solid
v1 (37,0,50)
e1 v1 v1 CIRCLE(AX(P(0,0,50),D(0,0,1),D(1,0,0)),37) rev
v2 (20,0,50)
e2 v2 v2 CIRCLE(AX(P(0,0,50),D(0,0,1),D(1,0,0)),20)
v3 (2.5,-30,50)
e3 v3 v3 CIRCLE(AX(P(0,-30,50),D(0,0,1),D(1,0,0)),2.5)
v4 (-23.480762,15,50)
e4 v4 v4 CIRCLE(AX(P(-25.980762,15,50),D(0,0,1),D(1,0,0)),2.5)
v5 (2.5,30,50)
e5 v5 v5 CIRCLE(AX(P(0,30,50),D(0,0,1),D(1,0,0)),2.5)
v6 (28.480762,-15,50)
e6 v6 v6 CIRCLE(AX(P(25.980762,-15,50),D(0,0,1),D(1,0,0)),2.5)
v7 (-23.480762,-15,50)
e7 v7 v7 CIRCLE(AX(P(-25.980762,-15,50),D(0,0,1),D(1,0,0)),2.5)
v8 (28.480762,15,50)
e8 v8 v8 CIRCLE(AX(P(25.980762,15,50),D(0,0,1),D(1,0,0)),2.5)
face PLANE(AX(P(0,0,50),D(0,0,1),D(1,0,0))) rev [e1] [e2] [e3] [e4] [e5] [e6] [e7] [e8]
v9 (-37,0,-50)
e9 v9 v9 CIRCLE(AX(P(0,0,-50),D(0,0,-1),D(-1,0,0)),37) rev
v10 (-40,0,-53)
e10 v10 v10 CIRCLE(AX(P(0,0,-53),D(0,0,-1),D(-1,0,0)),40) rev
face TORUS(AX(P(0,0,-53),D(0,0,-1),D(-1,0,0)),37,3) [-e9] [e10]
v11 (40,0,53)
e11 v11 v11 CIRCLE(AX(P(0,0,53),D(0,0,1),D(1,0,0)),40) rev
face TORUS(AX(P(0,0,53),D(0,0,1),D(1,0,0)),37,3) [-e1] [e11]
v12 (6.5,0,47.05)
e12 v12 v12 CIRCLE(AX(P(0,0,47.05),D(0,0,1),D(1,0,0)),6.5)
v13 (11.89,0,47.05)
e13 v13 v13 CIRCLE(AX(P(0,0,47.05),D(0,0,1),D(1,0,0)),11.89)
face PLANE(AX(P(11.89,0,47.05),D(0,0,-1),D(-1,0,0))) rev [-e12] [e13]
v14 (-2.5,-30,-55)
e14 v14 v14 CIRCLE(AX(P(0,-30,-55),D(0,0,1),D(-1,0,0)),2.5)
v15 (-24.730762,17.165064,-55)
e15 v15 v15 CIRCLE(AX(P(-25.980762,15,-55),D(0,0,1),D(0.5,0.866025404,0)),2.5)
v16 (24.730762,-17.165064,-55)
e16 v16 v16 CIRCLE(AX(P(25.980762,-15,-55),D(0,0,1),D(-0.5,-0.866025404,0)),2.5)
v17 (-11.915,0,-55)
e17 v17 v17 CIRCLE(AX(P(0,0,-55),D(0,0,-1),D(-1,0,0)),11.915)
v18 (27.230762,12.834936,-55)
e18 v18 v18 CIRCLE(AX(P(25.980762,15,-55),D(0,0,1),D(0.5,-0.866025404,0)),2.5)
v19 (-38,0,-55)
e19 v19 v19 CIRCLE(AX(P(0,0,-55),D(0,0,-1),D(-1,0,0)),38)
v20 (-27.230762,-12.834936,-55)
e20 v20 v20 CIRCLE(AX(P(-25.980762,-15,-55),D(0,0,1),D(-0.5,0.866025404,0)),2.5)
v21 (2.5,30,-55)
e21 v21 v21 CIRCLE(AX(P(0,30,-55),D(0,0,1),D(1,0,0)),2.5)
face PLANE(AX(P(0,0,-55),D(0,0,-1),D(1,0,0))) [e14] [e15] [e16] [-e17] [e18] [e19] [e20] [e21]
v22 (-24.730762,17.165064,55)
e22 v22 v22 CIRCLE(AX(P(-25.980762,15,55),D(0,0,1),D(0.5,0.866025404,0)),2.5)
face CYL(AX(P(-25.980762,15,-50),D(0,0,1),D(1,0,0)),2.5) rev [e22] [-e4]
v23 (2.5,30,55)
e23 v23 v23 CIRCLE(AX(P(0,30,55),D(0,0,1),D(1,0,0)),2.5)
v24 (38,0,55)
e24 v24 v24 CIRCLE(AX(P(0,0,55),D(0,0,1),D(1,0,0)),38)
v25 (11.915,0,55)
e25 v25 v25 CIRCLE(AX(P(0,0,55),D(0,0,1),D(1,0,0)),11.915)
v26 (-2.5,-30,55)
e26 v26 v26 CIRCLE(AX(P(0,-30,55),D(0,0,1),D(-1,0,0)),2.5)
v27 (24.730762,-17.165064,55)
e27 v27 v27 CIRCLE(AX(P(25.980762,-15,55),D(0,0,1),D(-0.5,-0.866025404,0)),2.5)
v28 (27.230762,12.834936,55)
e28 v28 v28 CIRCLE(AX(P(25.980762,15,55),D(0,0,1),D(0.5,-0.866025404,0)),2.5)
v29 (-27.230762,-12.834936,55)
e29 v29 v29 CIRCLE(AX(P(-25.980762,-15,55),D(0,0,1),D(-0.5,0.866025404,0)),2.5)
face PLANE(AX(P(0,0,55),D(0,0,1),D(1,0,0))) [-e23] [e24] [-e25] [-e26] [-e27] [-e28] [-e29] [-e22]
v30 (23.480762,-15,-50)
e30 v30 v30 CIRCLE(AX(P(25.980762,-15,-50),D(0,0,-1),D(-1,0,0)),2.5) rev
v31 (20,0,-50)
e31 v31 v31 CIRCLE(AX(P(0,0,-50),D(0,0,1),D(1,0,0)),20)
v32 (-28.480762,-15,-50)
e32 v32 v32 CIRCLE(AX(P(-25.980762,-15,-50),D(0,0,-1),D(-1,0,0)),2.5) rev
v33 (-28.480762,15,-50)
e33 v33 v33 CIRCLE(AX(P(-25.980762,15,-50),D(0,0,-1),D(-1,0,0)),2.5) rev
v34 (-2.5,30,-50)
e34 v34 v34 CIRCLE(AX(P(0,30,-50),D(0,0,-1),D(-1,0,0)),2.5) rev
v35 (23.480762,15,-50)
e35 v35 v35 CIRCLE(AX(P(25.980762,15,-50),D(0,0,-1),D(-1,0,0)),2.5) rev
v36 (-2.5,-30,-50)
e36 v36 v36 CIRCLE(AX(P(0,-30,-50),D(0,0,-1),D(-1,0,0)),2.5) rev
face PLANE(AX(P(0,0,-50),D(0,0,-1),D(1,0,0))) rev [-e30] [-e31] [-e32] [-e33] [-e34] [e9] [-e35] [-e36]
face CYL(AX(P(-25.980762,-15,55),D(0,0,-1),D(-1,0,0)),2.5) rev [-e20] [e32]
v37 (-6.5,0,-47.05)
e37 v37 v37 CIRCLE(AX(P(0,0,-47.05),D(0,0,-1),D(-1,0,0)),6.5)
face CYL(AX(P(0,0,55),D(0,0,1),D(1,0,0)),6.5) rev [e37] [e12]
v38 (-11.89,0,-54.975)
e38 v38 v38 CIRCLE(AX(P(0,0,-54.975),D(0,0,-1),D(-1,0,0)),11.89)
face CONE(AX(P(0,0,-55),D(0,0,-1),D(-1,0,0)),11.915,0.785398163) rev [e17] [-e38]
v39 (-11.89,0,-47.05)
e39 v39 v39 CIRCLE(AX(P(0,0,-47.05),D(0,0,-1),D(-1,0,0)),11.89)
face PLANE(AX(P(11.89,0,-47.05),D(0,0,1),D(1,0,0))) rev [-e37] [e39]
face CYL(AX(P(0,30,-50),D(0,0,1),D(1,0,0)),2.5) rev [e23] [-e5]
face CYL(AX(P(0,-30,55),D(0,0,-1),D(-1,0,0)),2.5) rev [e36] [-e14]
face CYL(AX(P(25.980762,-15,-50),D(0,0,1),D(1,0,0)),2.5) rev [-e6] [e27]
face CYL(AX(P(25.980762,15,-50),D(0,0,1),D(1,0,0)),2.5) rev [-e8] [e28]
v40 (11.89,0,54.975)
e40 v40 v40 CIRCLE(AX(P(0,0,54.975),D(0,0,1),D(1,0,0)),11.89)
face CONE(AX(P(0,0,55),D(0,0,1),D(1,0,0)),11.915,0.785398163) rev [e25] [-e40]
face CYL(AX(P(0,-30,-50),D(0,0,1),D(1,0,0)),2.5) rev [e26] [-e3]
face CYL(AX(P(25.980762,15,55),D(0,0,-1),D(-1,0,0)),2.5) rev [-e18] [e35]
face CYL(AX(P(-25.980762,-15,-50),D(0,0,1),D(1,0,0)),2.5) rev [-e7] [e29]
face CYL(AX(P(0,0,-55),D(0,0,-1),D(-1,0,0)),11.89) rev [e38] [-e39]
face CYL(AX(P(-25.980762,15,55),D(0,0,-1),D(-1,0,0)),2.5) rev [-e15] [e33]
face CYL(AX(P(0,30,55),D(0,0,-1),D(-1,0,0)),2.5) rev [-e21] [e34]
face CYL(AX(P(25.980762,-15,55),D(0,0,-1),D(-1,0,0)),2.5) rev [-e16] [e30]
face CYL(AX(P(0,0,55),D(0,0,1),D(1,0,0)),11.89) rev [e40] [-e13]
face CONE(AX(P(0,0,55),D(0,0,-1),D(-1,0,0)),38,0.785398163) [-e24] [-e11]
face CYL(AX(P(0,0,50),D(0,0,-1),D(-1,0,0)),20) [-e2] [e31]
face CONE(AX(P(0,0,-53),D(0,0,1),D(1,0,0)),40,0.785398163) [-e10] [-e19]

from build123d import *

# Parameters (mm, degrees)
SKETCH1_R                = 20
BOSS_EXTRUDE1_DEPTH      = 50
SKETCH2_R                = 40
BOSS_EXTRUDE2_DEPTH      = 5
CHAMFER1_SIZE            = 2
SKETCH3_R                = 2.5
CUT_EXTRUDE1_DEPTH       = 120.268604419
CIRPATTERN1_COUNT        = 6
FILLET1_R                = 3
MIRROR2_COPY_1_SKETCH_R  = 2.5
MIRROR2_COPY_1_DEPTH     = 120.268604419
MIRROR2_COPY_2_SKETCH_R  = 2.5
MIRROR2_COPY_2_DEPTH     = 120.268604419
MIRROR2_COPY_3_SKETCH_R  = 2.5
MIRROR2_COPY_3_DEPTH     = 120.268604419
MIRROR2_COPY_4_SKETCH_R  = 2.5
MIRROR2_COPY_4_DEPTH     = 120.268604419
MIRROR2_COPY_5_SKETCH_R  = 2.5
MIRROR2_COPY_5_DEPTH     = 120.268604419
CHAMFER1_OF_MIRROR2_SIZE = 2
FILLET1_OF_MIRROR2_R     = 3


with BuildPart() as part:
    # Sketch1 → Boss-Extrude1 (new, symmetric)
    with BuildSketch(Plane.XY):
        Circle(SKETCH1_R)
    extrude(amount=BOSS_EXTRUDE1_DEPTH, both=True)

    # Sketch2 → Boss-Extrude2 (add)
    with BuildSketch(Plane.XY.offset(50)):
        Circle(SKETCH2_R)
    boss_extrude2 = extrude(amount=BOSS_EXTRUDE2_DEPTH)

    # Chamfer1
    chamfer1_edges = [part.edges().sort_by_distance(p)[0] for p in [
        (-40, 0, 55),
    ]]
    chamfer(chamfer1_edges, length=CHAMFER1_SIZE)

    # Sketch3 → Cut-Extrude1 (cut, through all)
    with BuildSketch(Plane.XY.offset(55)):
        with Locations((0, 30)):
            Circle(SKETCH3_R)
    cut_extrude1 = extrude(amount=-CUT_EXTRUDE1_DEPTH, mode=Mode.SUBTRACT)

    # CirPattern1: Cut-Extrude1 ×6 about axis
    cirpattern1_axis = Axis((0, 0, 0), (0, 0, 1))
    for i in range(1, CIRPATTERN1_COUNT):
        add(cut_extrude1.rotate(cirpattern1_axis, i * 360 / CIRPATTERN1_COUNT), mode=Mode.SUBTRACT)

    # Fillet1
    fillet1_edges = [part.edges().sort_by_distance(p)[0] for p in [
        (-40, 0, 50),
    ]]
    fillet(fillet1_edges, radius=FILLET1_R - 0.0001)  # a hair under: the kernel refuses the full size

    # Sketch5 → CBORE for M12 Hex Head Bolt1 (revolve, cut)
    with BuildSketch(Plane(origin=(0, 0, 55), x_dir=(0, -1, 0), z_dir=(1, 0, 0))):
        Polygon((0, 0), (0, 110), (6.5, 110), (6.5, 7.95), (11.89, 7.95), (11.89, 0.025), (11.915, 0), align=None)
    cbore_for_m12_hex_head_bolt1 = revolve(axis=Axis((0, 0, 61.35), (0, 0, -1)), mode=Mode.SUBTRACT)

    # Mirror2: Boss-Extrude2, Cut-Extrude1, CBORE for M12 Hex Head Bolt1 across plane
    add(boss_extrude2.mirror(Plane.XY))
    add(cut_extrude1.mirror(Plane.XY), mode=Mode.SUBTRACT)
    add(cbore_for_m12_hex_head_bolt1.mirror(Plane.XY), mode=Mode.SUBTRACT)

    # Mirror2 copy 1 sketch → Mirror2 copy 1 (cut, through all)
    with BuildSketch(Plane(origin=(0, 0, -55), x_dir=(0.5000000000000001, 0.8660254037844386, 0), z_dir=(0, 0, -1))):
        with Locations((0, -30)):
            Circle(MIRROR2_COPY_1_SKETCH_R)
    extrude(amount=-MIRROR2_COPY_1_DEPTH, mode=Mode.SUBTRACT)

    # Mirror2 copy 2 sketch → Mirror2 copy 2 (cut, through all)
    with BuildSketch(Plane(origin=(0, 0, -55), x_dir=(-0.4999999999999998, 0.8660254037844387, 0), z_dir=(0, 0, -1))):
        with Locations((0, -30)):
            Circle(MIRROR2_COPY_2_SKETCH_R)
    extrude(amount=-MIRROR2_COPY_2_DEPTH, mode=Mode.SUBTRACT)

    # Mirror2 copy 3 sketch → Mirror2 copy 3 (cut, through all)
    with BuildSketch(Plane(origin=(0, 0, -55), x_dir=(-1, 0, 0), z_dir=(0, 0, -1))):
        with Locations((0, -30)):
            Circle(MIRROR2_COPY_3_SKETCH_R)
    extrude(amount=-MIRROR2_COPY_3_DEPTH, mode=Mode.SUBTRACT)

    # Mirror2 copy 4 sketch → Mirror2 copy 4 (cut, through all)
    with BuildSketch(Plane(origin=(0, 0, -55), x_dir=(-0.5000000000000004, -0.8660254037844384, 0), z_dir=(0, 0, -1))):
        with Locations((0, -30)):
            Circle(MIRROR2_COPY_4_SKETCH_R)
    extrude(amount=-MIRROR2_COPY_4_DEPTH, mode=Mode.SUBTRACT)

    # Mirror2 copy 5 sketch → Mirror2 copy 5 (cut, through all)
    with BuildSketch(Plane(origin=(0, 0, -55), x_dir=(0.5000000000000001, -0.8660254037844386, 0), z_dir=(0, 0, -1))):
        with Locations((0, -30)):
            Circle(MIRROR2_COPY_5_SKETCH_R)
    extrude(amount=-MIRROR2_COPY_5_DEPTH, mode=Mode.SUBTRACT)

    # Chamfer1 of Mirror2
    chamfer1_of_mirror2_edges = [part.edges().sort_by_distance(p)[0] for p in [
        (-40, 0, -55),
    ]]
    chamfer(chamfer1_of_mirror2_edges, length=CHAMFER1_OF_MIRROR2_SIZE)

    # Fillet1 of Mirror2
    fillet1_of_mirror2_edges = [part.edges().sort_by_distance(p)[0] for p in [
        (-40, 0, -50),
    ]]
    fillet(fillet1_of_mirror2_edges, radius=FILLET1_OF_MIRROR2_R - 0.0001)  # a hair under: the kernel refuses the full size


solid = part.part
